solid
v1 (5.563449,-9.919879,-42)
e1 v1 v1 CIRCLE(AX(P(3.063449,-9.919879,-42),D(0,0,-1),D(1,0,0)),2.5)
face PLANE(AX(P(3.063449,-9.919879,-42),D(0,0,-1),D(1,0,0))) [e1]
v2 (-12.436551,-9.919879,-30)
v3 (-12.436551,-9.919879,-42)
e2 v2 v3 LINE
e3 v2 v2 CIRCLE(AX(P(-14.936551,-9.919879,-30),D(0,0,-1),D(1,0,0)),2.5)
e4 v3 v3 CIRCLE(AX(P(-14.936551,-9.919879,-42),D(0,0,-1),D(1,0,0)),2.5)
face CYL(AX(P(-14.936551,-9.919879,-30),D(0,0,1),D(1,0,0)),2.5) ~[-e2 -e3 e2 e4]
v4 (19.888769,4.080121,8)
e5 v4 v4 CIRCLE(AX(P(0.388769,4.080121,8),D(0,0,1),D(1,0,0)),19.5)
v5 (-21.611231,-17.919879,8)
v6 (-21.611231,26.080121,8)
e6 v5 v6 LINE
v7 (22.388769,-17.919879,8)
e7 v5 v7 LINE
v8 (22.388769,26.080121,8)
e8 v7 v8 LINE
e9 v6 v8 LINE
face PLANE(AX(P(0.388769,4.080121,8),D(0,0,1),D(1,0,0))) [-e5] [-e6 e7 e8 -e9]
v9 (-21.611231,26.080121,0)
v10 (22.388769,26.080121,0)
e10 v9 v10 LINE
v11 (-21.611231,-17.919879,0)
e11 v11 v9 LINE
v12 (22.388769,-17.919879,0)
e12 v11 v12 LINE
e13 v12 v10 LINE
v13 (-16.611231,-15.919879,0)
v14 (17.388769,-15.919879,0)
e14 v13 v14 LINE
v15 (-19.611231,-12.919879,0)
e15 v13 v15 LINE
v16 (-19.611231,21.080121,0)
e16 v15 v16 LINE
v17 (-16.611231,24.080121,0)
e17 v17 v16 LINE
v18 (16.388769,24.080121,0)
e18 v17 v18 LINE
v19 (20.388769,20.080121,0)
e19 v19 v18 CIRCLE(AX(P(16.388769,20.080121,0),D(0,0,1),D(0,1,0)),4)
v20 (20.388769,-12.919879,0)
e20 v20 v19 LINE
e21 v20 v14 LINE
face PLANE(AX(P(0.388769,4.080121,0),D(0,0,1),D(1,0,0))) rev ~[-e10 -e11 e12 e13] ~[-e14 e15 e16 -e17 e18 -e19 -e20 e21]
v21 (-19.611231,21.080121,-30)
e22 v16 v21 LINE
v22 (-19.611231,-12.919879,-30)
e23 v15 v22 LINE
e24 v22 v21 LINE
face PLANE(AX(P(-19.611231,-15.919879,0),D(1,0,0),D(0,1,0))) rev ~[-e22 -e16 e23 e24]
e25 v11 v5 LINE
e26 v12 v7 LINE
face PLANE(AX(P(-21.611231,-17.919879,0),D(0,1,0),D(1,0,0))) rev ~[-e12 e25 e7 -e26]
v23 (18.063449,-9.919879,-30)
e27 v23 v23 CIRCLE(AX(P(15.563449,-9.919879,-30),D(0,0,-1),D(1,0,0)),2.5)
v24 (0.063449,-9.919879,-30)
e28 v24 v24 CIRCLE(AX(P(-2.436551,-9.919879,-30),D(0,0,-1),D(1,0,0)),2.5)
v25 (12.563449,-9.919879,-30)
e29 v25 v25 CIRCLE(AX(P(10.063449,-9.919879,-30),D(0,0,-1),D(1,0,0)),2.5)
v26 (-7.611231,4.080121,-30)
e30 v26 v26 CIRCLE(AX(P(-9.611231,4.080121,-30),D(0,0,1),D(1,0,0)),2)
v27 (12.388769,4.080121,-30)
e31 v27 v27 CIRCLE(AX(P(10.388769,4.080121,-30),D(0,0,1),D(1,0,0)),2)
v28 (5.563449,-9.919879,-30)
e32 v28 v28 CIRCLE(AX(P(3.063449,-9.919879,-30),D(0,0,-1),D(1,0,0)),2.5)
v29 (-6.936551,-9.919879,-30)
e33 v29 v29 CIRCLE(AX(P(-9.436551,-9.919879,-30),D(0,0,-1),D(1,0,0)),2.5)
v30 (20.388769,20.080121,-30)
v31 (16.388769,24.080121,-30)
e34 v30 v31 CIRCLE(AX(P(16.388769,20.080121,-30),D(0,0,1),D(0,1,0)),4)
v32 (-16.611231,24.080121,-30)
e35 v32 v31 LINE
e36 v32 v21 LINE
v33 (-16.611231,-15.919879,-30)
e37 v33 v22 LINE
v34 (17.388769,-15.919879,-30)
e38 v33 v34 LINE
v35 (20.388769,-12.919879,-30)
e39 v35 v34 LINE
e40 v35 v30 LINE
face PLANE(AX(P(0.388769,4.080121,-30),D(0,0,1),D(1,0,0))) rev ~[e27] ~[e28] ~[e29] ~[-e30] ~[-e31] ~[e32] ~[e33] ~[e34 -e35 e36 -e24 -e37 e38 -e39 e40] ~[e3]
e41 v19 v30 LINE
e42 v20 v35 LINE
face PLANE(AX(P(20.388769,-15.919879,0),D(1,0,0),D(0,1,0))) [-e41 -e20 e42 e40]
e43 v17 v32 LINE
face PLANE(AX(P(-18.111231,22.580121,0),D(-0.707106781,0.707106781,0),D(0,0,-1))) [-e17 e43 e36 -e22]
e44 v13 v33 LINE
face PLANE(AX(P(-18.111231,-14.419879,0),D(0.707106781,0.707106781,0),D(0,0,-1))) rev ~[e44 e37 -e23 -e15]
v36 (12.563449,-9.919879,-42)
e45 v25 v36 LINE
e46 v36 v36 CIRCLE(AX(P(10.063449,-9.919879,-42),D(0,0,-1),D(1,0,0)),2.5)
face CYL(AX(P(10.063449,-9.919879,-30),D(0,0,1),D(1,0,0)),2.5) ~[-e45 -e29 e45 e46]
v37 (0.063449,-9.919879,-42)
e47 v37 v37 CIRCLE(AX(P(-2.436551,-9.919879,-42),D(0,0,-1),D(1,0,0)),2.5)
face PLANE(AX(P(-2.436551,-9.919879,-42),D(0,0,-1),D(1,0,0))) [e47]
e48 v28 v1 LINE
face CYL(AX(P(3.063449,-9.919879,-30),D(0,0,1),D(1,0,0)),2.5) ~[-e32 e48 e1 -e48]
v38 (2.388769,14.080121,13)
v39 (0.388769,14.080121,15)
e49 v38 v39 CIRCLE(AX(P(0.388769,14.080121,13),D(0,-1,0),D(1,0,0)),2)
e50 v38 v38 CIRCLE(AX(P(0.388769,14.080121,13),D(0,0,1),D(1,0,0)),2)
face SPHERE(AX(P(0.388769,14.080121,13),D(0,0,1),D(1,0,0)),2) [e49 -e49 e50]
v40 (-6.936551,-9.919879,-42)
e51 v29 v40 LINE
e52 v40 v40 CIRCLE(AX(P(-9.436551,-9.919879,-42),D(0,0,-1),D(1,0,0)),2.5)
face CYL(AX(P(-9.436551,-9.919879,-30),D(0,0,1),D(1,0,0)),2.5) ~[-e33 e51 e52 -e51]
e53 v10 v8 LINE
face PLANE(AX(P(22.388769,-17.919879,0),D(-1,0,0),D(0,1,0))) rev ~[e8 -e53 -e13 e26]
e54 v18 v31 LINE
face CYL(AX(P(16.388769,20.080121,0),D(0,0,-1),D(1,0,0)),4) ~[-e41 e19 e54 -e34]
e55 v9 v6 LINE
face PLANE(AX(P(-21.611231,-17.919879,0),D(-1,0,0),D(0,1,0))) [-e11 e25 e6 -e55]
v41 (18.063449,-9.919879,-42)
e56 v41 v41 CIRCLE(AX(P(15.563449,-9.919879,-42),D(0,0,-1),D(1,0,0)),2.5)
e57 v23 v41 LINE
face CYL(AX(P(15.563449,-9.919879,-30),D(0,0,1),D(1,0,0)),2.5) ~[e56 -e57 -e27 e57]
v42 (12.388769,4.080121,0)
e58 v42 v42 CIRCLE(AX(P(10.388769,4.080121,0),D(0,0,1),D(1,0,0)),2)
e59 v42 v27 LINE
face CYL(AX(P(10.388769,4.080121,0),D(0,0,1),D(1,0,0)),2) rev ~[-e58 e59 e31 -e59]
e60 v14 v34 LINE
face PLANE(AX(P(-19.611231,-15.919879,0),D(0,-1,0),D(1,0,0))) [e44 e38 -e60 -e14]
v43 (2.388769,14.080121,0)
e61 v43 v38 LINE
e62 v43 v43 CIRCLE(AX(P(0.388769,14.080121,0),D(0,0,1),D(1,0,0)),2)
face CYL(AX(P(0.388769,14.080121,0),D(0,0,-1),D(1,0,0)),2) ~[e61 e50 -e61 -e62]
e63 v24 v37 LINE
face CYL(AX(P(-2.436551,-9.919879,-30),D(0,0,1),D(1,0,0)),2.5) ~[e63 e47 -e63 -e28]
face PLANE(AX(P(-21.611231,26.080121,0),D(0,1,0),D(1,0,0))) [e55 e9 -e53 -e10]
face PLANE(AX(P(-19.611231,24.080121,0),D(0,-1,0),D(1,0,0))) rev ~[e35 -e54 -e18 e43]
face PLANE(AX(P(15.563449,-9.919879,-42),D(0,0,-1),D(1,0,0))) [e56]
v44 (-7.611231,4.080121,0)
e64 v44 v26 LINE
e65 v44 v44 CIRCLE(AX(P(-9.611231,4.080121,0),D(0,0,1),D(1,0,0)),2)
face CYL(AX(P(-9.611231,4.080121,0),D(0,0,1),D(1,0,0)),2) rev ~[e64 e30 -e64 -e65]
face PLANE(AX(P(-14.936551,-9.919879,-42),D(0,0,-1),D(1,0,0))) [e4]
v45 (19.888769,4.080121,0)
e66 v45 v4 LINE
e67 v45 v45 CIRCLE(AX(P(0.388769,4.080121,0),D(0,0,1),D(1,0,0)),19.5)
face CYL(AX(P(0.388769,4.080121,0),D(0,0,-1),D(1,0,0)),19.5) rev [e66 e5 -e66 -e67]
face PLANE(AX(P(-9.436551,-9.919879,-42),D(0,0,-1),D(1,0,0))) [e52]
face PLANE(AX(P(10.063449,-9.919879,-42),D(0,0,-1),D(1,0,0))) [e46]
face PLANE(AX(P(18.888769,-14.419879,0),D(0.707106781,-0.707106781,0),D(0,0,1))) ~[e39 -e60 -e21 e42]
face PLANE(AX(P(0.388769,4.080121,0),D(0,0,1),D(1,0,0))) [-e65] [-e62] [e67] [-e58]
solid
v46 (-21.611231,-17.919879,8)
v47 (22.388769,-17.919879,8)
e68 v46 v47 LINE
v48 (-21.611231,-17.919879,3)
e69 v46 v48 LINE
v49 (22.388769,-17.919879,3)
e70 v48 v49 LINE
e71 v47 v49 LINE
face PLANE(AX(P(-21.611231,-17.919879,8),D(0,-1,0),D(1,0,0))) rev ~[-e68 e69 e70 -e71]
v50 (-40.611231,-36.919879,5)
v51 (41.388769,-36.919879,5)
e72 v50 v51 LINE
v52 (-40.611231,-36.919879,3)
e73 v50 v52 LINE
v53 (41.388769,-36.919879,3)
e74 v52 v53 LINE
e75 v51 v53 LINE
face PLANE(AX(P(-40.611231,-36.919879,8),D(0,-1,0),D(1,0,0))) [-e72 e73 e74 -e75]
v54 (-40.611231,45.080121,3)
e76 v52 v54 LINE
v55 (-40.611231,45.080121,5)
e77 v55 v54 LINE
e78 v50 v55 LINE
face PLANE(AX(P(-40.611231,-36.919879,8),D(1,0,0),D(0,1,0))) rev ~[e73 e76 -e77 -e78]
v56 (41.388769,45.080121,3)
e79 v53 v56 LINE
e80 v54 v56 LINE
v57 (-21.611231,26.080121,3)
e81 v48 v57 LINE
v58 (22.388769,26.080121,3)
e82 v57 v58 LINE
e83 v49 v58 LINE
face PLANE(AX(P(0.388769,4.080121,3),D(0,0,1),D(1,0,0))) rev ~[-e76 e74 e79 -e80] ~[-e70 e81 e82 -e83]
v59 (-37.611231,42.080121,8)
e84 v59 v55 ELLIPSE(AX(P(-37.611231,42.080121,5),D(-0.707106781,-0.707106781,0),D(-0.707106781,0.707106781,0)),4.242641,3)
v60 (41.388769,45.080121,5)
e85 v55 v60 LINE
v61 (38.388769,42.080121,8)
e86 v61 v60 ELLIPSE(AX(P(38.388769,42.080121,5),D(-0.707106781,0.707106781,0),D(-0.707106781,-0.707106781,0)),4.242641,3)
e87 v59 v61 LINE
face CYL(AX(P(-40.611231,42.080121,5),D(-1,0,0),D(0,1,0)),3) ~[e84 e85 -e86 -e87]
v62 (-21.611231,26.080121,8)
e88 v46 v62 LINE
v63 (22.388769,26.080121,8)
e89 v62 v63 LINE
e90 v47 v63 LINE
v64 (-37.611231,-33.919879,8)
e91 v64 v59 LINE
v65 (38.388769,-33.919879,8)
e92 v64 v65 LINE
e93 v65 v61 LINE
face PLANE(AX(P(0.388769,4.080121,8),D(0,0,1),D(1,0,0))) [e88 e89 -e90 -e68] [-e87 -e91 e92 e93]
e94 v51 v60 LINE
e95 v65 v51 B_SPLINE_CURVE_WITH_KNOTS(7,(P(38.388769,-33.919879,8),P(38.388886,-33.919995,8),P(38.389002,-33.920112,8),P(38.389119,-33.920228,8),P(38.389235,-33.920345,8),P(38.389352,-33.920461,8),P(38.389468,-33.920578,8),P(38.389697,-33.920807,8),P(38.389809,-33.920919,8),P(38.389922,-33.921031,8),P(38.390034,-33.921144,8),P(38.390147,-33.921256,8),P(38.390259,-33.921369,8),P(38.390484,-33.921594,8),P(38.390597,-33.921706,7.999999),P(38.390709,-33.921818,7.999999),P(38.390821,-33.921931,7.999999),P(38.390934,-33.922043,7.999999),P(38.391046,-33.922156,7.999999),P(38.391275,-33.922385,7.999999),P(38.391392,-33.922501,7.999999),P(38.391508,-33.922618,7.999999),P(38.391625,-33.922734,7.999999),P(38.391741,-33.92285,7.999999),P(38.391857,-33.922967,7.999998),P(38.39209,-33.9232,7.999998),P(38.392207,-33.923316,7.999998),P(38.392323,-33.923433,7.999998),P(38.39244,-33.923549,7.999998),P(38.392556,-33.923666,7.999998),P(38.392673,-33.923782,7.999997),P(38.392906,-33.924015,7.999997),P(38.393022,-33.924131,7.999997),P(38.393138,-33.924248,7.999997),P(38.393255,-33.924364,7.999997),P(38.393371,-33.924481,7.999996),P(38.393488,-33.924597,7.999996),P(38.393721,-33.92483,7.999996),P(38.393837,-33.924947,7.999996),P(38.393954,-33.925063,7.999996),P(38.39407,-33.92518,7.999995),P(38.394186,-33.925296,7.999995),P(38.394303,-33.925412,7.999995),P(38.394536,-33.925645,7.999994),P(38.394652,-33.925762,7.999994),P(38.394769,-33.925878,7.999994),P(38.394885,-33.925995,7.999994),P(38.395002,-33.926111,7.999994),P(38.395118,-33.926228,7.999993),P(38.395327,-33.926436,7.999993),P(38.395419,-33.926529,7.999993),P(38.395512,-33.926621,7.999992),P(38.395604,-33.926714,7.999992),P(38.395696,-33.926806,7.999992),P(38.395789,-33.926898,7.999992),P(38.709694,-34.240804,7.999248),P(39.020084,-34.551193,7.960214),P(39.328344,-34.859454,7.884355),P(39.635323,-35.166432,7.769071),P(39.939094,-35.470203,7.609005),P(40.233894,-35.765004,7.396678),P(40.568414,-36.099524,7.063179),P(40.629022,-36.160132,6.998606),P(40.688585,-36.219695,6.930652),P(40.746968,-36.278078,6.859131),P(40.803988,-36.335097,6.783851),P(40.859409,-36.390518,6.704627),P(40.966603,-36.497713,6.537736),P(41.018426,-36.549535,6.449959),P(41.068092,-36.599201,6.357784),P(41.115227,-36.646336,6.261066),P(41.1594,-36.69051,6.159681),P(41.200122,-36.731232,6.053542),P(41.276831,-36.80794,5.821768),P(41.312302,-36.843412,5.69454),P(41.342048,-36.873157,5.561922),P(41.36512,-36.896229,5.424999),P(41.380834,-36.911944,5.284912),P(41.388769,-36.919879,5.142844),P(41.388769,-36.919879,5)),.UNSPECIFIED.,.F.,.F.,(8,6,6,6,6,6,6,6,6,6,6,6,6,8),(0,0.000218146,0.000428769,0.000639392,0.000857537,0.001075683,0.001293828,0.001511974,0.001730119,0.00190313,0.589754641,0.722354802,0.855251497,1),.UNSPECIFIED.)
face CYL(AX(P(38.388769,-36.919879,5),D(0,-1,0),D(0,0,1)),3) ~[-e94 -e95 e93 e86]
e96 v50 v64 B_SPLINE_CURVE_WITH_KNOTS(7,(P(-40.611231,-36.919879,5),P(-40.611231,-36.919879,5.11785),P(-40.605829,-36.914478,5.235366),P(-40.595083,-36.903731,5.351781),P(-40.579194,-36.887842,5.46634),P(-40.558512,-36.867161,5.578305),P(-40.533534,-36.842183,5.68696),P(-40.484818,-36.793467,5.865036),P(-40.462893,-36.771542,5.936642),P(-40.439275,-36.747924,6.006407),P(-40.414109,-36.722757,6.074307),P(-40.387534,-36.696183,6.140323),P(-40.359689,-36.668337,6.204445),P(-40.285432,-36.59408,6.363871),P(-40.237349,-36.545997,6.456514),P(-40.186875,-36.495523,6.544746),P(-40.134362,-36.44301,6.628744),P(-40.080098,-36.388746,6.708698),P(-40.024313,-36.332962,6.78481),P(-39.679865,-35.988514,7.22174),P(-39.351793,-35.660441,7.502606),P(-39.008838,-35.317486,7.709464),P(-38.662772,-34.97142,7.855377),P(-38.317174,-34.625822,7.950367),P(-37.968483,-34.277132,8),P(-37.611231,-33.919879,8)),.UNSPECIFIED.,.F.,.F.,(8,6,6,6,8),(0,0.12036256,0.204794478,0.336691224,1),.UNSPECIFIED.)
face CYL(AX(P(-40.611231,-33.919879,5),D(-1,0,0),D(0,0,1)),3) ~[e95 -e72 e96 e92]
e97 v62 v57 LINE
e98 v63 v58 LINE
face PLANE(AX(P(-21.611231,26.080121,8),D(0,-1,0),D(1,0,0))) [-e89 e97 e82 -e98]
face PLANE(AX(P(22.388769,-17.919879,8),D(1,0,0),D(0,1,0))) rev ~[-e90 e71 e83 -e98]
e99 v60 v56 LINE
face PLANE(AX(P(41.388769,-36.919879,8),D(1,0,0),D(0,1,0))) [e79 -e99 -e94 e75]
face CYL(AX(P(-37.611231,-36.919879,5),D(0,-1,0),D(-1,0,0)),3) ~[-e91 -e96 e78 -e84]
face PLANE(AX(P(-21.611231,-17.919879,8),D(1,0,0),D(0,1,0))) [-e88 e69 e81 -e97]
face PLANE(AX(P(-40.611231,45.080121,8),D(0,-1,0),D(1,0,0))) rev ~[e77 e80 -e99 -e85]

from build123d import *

# Parameters (mm, degrees)
F0_W      = 44
F0_H      = 44
F0_W_2    = 40
F0_H_2    = 40
F0_R      = 19.5
F1_DEPTH  = 8
F0_R_2    = 2
F2_DEPTH  = 30
F3_DEPTH  = 15
F4_R      = 2
F5_W      = 82
F5_H      = 82
F5_W_2    = 44
F5_H_2    = 44
F6_DEPTH  = 5
F9_DEPTH  = 82.001
F10_DEPTH = 82.001
F11_R     = 4
F12_SIZE  = 3
F13_R     = 2.5
F14_DEPTH = 12


with BuildPart() as f1:
    # F0 (on Top) → F1 (new body)
    with BuildSketch(Plane.XY):
        with Locations((0.3887694329, 4.0801210612)):
            Rectangle(F0_W, F0_H)
        with Locations((0.3887694329, 4.0801210612)):
            Rectangle(F0_W_2, F0_H_2, mode=Mode.SUBTRACT)
        with Locations((0.3887694329, 4.0801210612)):
            Rectangle(F0_W_2, F0_H_2)
        with Locations((0.3887694329, 4.0801210612)):
            Circle(F0_R, mode=Mode.SUBTRACT)
    extrude(amount=F1_DEPTH)

    # F0 (on Top) → F2 (join)
    with BuildSketch(Plane.XY):
        with Locations((0.3887694329, 4.0801210612)):
            Rectangle(F0_W_2, F0_H_2)
        with Locations((0.3887694329, 4.0801210612)):
            Circle(F0_R, mode=Mode.SUBTRACT)
        with Locations((0.3887694329, 4.0801210612)):
            Circle(F0_R)
        with Locations((-9.6112305671, 4.0801210612)):
            Circle(F0_R_2, mode=Mode.SUBTRACT)
        with Locations((10.3887694329, 4.0801210612)):
            Circle(F0_R_2, mode=Mode.SUBTRACT)
        with Locations((0.3887694329, 14.0801210612)):
            Circle(F0_R_2, mode=Mode.SUBTRACT)
        with Locations((0.3887694329, 14.0801210612)):
            Circle(F0_R_2)
    extrude(amount=-F2_DEPTH)

    # F0 (on Top) → F3 (join)
    with BuildSketch(Plane.XY):
        with Locations((0.3887694329, 14.0801210612)):
            Circle(F0_R_2)
    extrude(amount=F3_DEPTH)

    # F4
    f4_edges = [f1.edges().sort_by_distance(p)[0] for p in [
        (-1.611231, 14.080121, 15),
    ]]
    fillet(f4_edges, radius=F4_R)

    # F11
    f11_edges = [f1.edges().sort_by_distance(p)[0] for p in [
        (20.388769, 24.080121, -15),
    ]]
    fillet(f11_edges, radius=F11_R)

    # F12
    f12_edges = [f1.edges().sort_by_distance(p)[0] for p in [
        (16.388769, 24.080121, -15),
        (-19.611231, 24.080121, -15),
        (-19.611231, -15.919879, -15),
        (20.388769, -15.919879, -15),
    ]]
    chamfer(f12_edges, length=F12_SIZE)

    # F13 (on face) → F14 (join)
    with BuildSketch(Plane(origin=(0, 0, -30), x_dir=(1, 0, 0), z_dir=(0, 0, -1))):
        with Locations((10.0634490028, 9.9198789388)):
            Circle(F13_R)
        with Locations((3.0634490028, 9.9198789388)):
            Circle(F13_R)
        with Locations((15.5634490028, 9.9198789388)):
            Circle(F13_R)
        with Locations((-2.4365509972, 9.9198789388)):
            Circle(F13_R)
        with Locations((-9.4365509972, 9.9198789388)):
            Circle(F13_R)
        with Locations((-14.9365509972, 9.9198789388)):
            Circle(F13_R)
    extrude(amount=F14_DEPTH)


with BuildPart() as f6:
    # F5 (on face) → F6 (new body)
    with BuildSketch(Plane.XY.offset(8)):
        with Locations((0.3887694329, 4.0801210612)):
            Rectangle(F5_W, F5_H)
        with Locations((0.3887694329, 4.0801210612)):
            Rectangle(F5_W_2, F5_H_2, mode=Mode.SUBTRACT)
    extrude(amount=-F6_DEPTH)

    # F7 (on face) → F9 (cut, through all)
    with BuildSketch(Plane(origin=(-40.6112305671, 0, 0), x_dir=(0, -1, 0), z_dir=(-1, 0, 0))):
        with BuildLine():
            ThreePointArc((-45.0801210612, 5), (-44.2014414048, 7.1213203436), (-42.0801210612, 8))
            Line((-42.0801210612, 8), (-45.0801210612, 8))
            Line((-45.0801210612, 8), (-45.0801210612, 5))
        make_face()
        with BuildLine():
            ThreePointArc((33.9198789388, 8), (36.0411992823, 7.1213203436), (36.9198789388, 5))
            Line((36.9198789388, 5), (36.9198789388, 8))
            Line((36.9198789388, 8), (33.9198789388, 8))
        make_face()
    extrude(amount=-F9_DEPTH, mode=Mode.SUBTRACT)

    # F8 (on face) → F10 (cut, through all)
    with BuildSketch(Plane.XZ.offset(36.9198789388)):
        with BuildLine():
            Line((41.3887694329, 8), (38.3887694329, 8))
            ThreePointArc((38.3887694329, 8), (40.5100897765, 7.1213203436), (41.3887694329, 5))
            Line((41.3887694329, 5), (41.3887694329, 8))
        make_face()
        with BuildLine():
            ThreePointArc((-40.6112305671, 5), (-39.7325509107, 7.1213203436), (-37.6112305671, 8))
            Line((-37.6112305671, 8), (-40.6112305671, 8))
            Line((-40.6112305671, 8), (-40.6112305671, 5))
        make_face()
    extrude(amount=-F10_DEPTH, mode=Mode.SUBTRACT)


solid = Compound([f1.part, f6.part])
